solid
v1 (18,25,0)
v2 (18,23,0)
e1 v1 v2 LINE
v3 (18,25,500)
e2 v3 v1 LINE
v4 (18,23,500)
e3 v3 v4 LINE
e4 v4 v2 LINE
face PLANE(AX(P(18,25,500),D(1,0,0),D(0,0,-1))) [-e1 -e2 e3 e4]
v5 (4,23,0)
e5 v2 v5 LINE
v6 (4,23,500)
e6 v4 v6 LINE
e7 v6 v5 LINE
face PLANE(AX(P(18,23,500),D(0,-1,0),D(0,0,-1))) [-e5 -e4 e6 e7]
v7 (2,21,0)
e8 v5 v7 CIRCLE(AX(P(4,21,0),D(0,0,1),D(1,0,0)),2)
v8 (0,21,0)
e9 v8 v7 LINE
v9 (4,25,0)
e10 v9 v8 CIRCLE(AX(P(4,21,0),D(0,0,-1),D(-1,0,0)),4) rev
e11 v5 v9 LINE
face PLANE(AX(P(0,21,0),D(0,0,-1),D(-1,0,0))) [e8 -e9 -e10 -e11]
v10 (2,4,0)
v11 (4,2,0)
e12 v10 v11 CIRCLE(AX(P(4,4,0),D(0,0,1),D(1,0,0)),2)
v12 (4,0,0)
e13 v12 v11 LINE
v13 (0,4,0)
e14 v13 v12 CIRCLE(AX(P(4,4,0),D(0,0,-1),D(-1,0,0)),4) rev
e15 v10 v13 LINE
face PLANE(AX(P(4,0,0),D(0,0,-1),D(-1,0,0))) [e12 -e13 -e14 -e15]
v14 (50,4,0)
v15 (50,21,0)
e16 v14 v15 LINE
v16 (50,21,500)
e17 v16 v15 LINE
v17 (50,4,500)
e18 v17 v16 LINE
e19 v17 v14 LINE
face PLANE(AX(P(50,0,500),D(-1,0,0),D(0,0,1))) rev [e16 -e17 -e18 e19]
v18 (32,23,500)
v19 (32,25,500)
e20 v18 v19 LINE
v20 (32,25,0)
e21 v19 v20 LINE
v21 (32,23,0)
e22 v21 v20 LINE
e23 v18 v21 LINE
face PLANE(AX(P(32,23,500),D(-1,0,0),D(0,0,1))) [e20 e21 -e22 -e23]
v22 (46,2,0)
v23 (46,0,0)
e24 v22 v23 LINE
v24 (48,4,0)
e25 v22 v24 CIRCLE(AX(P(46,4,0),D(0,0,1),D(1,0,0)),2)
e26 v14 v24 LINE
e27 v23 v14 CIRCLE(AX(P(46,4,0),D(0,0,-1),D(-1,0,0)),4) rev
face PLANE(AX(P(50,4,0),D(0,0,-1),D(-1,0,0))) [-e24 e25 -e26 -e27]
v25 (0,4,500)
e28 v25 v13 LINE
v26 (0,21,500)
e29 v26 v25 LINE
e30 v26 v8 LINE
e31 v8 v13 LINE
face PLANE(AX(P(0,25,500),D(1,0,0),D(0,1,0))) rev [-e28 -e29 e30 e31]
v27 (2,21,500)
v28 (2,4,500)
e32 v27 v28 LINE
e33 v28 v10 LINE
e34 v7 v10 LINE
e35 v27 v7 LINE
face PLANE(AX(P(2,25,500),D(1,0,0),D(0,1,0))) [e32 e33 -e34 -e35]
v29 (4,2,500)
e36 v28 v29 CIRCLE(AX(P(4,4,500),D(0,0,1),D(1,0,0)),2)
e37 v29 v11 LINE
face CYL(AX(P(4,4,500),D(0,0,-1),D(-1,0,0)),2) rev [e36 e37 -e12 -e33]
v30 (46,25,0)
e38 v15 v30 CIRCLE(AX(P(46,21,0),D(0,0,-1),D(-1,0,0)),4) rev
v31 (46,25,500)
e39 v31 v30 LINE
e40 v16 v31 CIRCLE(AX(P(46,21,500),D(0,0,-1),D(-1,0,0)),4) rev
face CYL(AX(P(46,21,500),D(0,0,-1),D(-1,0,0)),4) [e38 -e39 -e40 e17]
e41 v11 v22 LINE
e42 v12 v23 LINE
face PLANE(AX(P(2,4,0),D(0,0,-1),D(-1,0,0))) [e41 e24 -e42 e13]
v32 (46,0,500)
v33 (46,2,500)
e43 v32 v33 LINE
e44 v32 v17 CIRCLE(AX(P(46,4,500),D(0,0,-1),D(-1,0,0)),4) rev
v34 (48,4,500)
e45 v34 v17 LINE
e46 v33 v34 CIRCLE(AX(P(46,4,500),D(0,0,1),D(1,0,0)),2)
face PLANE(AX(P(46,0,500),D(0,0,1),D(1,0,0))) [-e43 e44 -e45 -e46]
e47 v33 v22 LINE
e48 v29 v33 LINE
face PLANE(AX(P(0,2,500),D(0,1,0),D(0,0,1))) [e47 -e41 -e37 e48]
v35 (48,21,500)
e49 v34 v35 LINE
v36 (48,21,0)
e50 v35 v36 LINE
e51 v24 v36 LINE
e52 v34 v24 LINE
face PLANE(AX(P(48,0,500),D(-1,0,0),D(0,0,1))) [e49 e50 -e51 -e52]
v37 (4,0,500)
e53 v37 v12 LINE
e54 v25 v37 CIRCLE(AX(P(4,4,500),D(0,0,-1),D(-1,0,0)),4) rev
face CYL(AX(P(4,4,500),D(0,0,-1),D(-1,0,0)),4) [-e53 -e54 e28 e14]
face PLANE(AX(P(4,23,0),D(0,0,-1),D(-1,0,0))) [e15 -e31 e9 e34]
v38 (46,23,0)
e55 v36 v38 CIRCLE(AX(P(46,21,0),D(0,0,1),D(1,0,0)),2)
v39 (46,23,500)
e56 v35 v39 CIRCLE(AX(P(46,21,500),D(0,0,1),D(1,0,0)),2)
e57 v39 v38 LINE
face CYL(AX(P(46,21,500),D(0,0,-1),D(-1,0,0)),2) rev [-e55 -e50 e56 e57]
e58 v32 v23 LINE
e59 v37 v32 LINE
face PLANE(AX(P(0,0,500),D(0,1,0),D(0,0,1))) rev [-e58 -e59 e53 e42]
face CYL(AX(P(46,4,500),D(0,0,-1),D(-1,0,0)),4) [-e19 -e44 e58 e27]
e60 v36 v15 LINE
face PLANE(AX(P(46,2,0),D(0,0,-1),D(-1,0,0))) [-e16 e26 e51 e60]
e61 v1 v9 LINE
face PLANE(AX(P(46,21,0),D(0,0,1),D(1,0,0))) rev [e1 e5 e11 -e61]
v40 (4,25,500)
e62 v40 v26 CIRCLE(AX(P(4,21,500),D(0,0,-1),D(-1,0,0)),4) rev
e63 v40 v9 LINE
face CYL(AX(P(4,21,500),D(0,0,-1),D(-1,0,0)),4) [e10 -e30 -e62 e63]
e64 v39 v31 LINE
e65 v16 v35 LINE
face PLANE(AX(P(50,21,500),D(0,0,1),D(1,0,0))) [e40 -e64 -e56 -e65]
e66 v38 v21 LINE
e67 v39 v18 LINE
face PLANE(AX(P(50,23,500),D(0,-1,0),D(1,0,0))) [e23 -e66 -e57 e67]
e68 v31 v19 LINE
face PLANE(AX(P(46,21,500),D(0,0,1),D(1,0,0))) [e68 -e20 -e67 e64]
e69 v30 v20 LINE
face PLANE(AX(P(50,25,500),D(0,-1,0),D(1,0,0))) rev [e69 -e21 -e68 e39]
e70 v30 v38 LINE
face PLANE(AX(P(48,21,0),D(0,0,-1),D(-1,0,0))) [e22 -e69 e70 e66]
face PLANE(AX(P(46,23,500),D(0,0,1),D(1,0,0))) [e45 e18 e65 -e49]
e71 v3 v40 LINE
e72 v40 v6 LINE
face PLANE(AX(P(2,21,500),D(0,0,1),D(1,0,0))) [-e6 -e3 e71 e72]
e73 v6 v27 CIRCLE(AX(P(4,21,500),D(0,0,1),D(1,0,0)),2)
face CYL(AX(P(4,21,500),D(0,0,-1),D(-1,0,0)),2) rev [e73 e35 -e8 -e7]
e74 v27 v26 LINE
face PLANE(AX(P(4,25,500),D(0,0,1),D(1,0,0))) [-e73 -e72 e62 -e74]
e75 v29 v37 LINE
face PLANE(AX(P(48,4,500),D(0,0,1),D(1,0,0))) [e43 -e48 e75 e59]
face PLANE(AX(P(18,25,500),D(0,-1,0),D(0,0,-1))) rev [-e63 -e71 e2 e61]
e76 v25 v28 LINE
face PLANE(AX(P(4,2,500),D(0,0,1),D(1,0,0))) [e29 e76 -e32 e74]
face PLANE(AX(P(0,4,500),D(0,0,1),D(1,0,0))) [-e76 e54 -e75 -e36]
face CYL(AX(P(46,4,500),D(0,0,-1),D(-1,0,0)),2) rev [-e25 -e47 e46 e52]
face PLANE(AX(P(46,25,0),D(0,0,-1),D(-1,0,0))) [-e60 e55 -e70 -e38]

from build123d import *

# Parameters (mm, degrees)
BASE_FLANGE1_DEPTH = 500


# Sheet-metal steps are written as plain solids
with BuildPart() as part:
    # Sketch1 → Base-Flange1 (new body)
    with BuildSketch(Plane.XY):
        with BuildLine():
            Line((18, 25), (4, 25))
            ThreePointArc((4, 25), (1.171572875, 23.828427125), (0, 21))
            Line((0, 21), (0, 4))
            ThreePointArc((0, 4), (1.171572875, 1.171572875), (4, 0))
            Line((4, 0), (46, 0))
            ThreePointArc((46, 0), (48.828427125, 1.171572875), (50, 4))
            Line((50, 4), (50, 21))
            ThreePointArc((50, 21), (48.828427125, 23.828427125), (46, 25))
            Line((46, 25), (32, 25))
            Line((32, 25), (32, 23))
            Line((32, 23), (46, 23))
            ThreePointArc((46, 23), (47.414213562, 22.414213562), (48, 21))
            Line((48, 21), (48, 4))
            ThreePointArc((48, 4), (47.414213562, 2.585786438), (46, 2))
            Line((46, 2), (4, 2))
            ThreePointArc((4, 2), (2.585786438, 2.585786438), (2, 4))
            Line((2, 4), (2, 21))
            ThreePointArc((2, 21), (2.585786438, 22.414213562), (4, 23))
            Line((4, 23), (18, 23))
            Line((18, 23), (18, 25))
        make_face()
    extrude(amount=BASE_FLANGE1_DEPTH)


solid = part.part
